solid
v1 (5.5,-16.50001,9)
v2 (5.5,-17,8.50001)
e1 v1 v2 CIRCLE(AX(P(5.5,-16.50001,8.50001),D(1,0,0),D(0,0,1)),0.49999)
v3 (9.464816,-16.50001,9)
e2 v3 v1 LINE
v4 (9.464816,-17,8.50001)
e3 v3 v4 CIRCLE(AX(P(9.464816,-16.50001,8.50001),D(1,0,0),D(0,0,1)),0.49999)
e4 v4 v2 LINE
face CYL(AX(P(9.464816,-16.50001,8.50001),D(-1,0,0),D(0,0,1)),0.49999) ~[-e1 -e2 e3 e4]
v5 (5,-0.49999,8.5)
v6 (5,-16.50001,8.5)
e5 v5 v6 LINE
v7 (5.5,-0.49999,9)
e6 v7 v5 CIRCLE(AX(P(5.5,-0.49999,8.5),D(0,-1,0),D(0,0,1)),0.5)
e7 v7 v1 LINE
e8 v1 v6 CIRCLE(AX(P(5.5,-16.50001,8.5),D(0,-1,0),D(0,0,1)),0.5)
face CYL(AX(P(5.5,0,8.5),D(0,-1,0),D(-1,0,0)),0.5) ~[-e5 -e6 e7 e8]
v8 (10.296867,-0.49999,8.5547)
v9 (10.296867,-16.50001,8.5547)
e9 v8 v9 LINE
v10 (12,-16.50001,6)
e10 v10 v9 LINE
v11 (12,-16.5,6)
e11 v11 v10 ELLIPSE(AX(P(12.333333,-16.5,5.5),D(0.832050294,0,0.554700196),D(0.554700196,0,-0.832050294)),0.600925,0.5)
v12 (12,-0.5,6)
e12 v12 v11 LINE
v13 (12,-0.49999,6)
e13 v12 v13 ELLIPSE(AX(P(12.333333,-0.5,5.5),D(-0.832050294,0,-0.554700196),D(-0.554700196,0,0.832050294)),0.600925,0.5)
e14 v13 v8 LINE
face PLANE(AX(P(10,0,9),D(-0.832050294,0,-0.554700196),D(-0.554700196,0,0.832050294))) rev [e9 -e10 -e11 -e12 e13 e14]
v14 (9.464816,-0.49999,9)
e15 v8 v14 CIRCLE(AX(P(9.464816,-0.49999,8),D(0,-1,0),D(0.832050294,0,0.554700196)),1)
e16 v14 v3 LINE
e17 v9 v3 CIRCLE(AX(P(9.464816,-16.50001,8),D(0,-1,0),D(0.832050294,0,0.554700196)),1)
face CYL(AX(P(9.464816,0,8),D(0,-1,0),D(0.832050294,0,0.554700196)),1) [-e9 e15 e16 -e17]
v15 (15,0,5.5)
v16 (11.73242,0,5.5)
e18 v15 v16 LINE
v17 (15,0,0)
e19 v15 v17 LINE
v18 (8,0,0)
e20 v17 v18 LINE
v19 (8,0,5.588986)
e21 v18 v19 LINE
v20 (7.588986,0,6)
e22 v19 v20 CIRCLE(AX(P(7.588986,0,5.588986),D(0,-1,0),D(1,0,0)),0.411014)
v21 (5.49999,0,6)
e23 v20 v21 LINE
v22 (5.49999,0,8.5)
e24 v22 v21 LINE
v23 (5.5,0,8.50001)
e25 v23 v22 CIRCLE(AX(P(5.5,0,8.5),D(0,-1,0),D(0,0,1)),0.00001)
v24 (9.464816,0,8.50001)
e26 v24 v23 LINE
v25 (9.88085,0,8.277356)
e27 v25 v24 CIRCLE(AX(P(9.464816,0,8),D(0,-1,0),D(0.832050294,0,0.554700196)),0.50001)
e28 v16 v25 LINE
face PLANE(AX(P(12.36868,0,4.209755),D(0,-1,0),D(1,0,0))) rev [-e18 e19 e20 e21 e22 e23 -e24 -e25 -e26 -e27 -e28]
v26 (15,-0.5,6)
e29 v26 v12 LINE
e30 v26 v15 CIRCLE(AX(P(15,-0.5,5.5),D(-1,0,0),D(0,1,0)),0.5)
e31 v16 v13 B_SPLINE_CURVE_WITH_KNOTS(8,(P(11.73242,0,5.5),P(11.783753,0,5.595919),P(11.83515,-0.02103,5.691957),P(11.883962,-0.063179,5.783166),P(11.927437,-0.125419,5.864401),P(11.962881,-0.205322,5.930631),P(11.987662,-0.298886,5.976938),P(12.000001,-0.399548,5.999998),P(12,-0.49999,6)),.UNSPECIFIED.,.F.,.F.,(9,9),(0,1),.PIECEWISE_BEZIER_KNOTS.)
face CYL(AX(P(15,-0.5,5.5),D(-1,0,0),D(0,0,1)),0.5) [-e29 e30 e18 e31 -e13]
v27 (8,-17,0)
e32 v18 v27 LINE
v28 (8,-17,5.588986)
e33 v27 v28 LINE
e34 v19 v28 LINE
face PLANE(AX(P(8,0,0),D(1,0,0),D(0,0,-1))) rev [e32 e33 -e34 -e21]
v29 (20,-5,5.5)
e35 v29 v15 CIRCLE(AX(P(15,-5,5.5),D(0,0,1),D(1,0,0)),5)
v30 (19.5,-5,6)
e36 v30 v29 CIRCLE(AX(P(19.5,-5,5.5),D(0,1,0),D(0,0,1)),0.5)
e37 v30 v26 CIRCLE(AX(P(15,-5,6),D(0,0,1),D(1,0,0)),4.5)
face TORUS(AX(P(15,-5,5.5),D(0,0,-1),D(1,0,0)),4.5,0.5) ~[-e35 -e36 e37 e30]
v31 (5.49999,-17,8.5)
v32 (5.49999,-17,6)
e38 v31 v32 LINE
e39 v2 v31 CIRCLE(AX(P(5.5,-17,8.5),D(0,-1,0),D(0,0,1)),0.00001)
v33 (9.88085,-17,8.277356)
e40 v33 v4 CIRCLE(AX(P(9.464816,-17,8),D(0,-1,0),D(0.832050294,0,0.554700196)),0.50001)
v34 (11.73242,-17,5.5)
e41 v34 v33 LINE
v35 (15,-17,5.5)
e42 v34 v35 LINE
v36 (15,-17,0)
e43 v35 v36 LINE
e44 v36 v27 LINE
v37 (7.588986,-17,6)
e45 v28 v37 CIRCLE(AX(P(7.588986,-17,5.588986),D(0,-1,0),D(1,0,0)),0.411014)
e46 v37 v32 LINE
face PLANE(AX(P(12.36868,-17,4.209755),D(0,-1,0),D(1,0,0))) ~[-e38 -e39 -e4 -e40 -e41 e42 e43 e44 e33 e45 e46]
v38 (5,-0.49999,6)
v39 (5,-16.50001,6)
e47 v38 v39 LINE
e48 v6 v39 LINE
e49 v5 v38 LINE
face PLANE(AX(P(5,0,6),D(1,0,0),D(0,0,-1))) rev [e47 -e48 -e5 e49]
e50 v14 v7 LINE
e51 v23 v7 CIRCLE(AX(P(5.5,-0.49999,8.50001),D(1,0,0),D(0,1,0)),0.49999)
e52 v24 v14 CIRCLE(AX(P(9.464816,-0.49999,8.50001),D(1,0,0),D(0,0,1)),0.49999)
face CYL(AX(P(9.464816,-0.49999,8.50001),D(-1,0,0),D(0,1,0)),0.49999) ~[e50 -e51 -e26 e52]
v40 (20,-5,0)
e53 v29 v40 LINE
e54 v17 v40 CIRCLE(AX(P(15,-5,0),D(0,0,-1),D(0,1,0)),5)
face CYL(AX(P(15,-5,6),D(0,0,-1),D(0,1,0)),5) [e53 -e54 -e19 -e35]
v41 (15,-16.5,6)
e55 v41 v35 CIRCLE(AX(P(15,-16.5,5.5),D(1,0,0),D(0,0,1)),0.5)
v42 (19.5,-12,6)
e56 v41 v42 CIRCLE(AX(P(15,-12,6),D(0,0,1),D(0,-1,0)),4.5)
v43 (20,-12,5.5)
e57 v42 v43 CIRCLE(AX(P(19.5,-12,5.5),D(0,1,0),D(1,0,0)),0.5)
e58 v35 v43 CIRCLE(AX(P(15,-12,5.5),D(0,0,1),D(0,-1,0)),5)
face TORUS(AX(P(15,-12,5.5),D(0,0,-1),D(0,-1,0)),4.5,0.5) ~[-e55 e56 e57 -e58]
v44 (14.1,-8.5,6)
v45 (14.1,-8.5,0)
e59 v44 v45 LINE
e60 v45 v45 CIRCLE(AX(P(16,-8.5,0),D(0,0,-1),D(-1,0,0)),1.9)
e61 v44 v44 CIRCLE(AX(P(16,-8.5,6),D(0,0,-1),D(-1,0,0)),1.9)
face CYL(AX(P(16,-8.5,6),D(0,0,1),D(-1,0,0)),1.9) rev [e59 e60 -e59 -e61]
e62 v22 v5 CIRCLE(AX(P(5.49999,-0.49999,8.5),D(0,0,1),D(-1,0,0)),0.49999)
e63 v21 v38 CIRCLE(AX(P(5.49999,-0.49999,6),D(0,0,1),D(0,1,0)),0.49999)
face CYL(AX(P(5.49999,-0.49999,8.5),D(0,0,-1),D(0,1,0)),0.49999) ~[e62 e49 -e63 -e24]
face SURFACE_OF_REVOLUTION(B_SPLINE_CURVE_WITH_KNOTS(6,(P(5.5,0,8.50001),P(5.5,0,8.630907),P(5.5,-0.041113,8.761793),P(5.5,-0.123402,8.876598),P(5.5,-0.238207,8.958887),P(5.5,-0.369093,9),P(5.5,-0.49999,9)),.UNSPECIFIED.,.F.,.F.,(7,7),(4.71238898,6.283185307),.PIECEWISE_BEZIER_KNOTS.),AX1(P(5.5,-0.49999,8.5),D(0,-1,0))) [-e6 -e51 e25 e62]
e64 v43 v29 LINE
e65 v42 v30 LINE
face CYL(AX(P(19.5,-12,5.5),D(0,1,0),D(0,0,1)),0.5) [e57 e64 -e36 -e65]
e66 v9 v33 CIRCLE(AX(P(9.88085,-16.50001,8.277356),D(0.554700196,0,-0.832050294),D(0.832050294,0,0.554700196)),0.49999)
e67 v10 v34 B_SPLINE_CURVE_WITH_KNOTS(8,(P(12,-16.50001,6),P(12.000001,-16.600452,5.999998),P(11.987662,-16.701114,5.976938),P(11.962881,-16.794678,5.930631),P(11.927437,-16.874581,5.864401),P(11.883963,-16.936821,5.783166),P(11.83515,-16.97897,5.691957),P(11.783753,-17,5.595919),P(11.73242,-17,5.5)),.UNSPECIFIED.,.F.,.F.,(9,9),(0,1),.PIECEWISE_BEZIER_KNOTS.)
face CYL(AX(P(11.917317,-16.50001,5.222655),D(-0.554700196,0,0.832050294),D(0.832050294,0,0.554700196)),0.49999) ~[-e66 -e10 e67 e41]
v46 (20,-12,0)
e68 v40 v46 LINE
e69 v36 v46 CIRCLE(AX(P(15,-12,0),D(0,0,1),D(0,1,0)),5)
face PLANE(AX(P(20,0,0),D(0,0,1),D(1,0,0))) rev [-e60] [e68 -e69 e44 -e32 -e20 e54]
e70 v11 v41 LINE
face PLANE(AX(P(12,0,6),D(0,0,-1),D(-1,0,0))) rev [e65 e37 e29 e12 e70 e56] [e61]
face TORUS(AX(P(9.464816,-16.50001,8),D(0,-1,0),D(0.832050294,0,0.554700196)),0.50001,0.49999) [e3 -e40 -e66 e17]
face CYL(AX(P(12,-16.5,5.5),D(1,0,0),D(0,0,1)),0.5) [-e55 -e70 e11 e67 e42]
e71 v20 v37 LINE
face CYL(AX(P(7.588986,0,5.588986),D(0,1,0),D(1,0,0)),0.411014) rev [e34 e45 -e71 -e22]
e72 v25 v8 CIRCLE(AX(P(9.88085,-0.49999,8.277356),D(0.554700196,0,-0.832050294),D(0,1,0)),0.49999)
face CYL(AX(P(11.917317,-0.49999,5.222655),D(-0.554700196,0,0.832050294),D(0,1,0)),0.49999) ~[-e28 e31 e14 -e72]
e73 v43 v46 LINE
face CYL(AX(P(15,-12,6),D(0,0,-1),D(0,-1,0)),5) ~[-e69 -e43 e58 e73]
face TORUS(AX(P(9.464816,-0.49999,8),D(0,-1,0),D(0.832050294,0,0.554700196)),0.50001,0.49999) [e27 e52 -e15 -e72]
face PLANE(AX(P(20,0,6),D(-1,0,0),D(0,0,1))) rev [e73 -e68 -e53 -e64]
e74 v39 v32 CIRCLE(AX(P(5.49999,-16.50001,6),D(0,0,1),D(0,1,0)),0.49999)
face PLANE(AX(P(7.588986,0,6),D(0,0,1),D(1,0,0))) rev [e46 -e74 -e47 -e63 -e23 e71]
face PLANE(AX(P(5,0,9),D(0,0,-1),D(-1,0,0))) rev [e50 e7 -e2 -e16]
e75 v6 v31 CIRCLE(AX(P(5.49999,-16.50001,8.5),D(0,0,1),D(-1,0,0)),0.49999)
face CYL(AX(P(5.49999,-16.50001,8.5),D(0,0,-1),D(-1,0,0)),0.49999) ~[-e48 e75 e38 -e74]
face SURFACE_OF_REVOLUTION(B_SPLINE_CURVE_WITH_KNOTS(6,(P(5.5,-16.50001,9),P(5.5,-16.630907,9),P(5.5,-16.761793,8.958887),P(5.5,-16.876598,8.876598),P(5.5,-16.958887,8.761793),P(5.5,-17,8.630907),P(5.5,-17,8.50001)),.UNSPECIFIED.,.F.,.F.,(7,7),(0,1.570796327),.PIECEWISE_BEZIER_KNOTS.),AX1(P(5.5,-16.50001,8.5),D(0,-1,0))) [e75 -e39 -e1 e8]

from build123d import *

# Parameters (mm, degrees)
F1_DEPTH = 17
F2_R     = 0.5
F3_R     = 1.9
F4_DEPTH = 25
F5_R     = 5
F6_R     = 0.5
F7_R     = 1
F8_R     = 0.49999


# Not quite as in the source:
# - a fillet or chamfer is up to 0.001 mm smaller than in the source, because OpenCascade refuses the exact size


with BuildPart() as f1:
    # F0 (on Front) → F1 (new body)
    with BuildSketch(Plane.XZ):
        with BuildLine():
            Line((-12, 0), (0, 0))
            Line((0, 0), (0, 5.58898558))
            ThreePointArc((0, 5.58898558), (0.1203833365, 5.8796166635), (0.41101442, 6))
            Line((0.41101442, 6), (3, 6))
            Line((3, 6), (3, 9))
            Line((3, 9), (-2, 9))
            Line((-2, 9), (-4, 6))
            Line((-4, 6), (-12, 6))
            Line((-12, 6), (-12, 0))
        make_face()
    extrude(amount=F1_DEPTH)

    # F2
    f2_edges = [f1.edges().sort_by_distance(p)[0] for p in [
        (3, -8.5, 9),
    ]]
    fillet(f2_edges, radius=F2_R)

    # F3 (on face) → F4 (cut)
    with BuildSketch(Plane.XY.offset(6)):
        with Locations((-8, -8.5)):
            Circle(F3_R)
    extrude(amount=-F4_DEPTH, mode=Mode.SUBTRACT)

    # F5
    f5_edges = [f1.edges().sort_by_distance(p)[0] for p in [
        (-12, -17, 3),
        (-12, 0, 3),
    ]]
    fillet(f5_edges, radius=F5_R)

    # F6
    f6_edges = [f1.edges().sort_by_distance(p)[0] for p in [
        (-10.535534, -15.535534, 6),
    ]]
    fillet(f6_edges, radius=F6_R)

    # F7
    f7_edges = [f1.edges().sort_by_distance(p)[0] for p in [
        (-2, -8.5, 9),
    ]]
    fillet(f7_edges, radius=F7_R)

    # F8 (radius 0.5 in the source; OpenCascade refuses exactly that, so slightly less here)
    f8_edges = [f1.edges().sort_by_distance(p)[0] for p in [
        (-3.148433, -17, 7.27735),
        (-3.148433, 0, 7.27735),
    ]]
    fillet(f8_edges, radius=F8_R)


with BuildPart() as f10_1:
    # F10: instance of F1
    add(f1.part.mirror(Plane(origin=(4, -8.5, 7.25), x_dir=(0, 1, 0), z_dir=(1, 0, 0))))


solid = f10_1.part
